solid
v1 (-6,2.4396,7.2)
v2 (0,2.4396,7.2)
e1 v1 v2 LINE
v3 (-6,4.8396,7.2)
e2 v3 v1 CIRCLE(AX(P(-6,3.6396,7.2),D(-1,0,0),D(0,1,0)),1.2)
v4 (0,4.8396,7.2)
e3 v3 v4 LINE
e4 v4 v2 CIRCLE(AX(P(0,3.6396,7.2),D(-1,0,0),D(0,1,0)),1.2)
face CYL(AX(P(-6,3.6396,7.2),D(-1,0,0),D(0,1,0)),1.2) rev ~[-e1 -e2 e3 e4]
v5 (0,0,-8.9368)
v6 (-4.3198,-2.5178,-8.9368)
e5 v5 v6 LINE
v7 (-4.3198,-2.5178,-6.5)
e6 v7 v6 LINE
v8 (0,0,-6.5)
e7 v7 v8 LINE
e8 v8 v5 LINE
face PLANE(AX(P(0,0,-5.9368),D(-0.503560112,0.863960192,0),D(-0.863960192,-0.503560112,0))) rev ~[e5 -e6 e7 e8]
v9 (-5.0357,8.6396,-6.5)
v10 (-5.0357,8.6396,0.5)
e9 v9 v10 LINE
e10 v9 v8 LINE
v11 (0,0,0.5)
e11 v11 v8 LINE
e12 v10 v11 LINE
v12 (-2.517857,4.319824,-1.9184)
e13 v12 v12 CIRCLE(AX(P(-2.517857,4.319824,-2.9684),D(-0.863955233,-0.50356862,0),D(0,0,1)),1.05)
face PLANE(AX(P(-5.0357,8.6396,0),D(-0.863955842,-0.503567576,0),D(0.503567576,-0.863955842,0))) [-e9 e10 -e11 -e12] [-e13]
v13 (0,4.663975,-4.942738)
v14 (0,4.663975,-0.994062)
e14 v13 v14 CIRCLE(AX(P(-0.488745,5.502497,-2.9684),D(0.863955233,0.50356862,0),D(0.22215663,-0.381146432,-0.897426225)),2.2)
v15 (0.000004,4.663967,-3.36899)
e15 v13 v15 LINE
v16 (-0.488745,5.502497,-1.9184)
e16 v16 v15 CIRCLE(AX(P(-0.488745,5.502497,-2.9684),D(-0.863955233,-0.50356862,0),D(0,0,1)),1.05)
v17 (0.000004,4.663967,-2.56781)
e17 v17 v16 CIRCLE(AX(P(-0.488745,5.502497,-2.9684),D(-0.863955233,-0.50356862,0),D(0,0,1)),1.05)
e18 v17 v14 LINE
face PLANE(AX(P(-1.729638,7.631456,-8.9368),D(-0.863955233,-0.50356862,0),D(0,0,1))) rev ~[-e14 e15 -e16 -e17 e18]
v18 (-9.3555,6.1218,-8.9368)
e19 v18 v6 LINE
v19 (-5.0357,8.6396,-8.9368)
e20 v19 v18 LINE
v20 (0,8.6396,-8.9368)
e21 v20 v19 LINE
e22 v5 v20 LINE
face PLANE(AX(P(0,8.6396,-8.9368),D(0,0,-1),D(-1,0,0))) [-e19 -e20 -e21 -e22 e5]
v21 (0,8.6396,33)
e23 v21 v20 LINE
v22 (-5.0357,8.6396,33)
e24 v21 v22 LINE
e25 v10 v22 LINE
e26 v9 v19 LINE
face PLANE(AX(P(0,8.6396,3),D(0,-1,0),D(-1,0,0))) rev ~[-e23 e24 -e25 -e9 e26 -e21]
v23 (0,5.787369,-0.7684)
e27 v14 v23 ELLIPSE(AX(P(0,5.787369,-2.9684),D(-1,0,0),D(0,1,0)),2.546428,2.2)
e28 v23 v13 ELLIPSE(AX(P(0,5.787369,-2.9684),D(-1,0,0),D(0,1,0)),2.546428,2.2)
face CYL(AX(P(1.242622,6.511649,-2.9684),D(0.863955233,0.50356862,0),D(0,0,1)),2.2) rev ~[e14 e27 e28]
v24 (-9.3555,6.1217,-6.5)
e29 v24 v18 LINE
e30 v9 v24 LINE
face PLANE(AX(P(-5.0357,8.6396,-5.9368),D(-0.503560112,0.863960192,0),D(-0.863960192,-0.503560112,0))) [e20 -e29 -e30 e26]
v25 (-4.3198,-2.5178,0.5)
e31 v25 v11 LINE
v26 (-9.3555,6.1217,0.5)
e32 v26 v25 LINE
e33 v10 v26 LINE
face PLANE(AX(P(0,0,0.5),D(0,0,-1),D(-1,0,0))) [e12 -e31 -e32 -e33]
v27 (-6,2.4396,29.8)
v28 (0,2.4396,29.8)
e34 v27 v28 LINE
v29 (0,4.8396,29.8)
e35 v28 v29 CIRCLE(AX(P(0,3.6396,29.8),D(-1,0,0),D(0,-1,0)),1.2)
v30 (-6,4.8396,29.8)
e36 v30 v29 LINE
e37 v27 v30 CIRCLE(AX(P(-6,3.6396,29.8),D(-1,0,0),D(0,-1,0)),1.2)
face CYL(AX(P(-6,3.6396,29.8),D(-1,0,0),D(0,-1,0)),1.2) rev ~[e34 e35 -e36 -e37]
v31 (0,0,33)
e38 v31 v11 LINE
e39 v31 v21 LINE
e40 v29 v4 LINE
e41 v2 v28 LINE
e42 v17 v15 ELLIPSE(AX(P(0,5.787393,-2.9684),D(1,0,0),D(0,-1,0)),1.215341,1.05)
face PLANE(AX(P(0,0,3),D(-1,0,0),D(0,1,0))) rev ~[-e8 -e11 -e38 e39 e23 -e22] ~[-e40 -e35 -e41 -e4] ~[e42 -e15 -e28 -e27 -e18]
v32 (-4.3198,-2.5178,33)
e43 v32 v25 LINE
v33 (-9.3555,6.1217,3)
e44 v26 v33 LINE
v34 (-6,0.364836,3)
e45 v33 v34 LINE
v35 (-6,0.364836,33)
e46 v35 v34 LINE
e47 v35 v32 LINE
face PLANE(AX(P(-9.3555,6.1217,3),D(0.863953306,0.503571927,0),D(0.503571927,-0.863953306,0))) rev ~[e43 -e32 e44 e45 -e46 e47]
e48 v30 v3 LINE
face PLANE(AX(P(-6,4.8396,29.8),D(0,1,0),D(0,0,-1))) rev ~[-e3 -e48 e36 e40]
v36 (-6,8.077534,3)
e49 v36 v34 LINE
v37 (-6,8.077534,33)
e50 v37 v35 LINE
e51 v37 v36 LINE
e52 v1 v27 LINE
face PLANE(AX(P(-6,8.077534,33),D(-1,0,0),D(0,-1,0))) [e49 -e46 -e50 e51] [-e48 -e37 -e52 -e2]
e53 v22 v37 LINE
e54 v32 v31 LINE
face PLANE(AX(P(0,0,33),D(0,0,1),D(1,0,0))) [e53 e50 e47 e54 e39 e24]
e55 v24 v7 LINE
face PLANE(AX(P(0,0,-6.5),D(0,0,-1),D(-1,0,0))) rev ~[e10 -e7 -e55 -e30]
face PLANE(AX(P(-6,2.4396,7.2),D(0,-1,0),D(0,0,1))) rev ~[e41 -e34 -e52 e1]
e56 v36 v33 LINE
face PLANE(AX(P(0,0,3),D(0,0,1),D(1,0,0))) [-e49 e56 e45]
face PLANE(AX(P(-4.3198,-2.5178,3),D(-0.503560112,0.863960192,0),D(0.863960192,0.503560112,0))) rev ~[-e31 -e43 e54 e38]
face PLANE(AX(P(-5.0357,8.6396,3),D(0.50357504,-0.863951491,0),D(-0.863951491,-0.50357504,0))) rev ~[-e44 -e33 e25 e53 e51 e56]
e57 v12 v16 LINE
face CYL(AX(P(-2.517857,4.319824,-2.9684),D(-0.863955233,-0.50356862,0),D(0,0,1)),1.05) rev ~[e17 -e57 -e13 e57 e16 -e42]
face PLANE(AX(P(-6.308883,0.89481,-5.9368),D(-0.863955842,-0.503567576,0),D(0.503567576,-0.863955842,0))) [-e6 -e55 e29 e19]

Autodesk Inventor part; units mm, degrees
ref_plane "YZ Plane" through (0, 0, 0) normal (1, 0, 0) x (0, 1, 0)
ref_plane "XZ Plane" through (0, 0, 0) normal (0, 1, 0) x (-1, 0, 0)
sketch "Skizze1" plane through (0, 0, 0) normal (0, 0, 1) x (1, 0, 0)
  line L0 (0, 0) -> (-5.0357, 8.6396) projected
  line L1 (-5.0357, 8.6396) -> (-9.3555, 6.1217) projected
  line L2 (-4.3198, -2.5178) -> (-9.3555, 6.1217) projected
  line L3 (0, 0) -> (-4.3198, -2.5178) projected
  line L4 (0, 0) -> (0, 8.6396)
  line L5 (0, 8.6396) -> (-5.0357, 8.6396)
extrude "Extrusion1" add sketch "Skizze1" along normal blind 3
sketch "Skizze2" plane through (0, 0, 3) normal (0, 0, 1) x (1, 0, 0)
  line L0 (0, 8.6396) -> (-5.0357, 8.6396) projected
  line L1 (0, 0) -> (0, 8.6396) projected
  line L2 (-4.3198, -2.5178) -> (0, 0) projected
  line L3 (-9.3555, 6.1217) -> (-4.3198, -2.5178) projected
  line L4 (-5.0357, 8.6396) -> (-9.3555, 6.1217) projected
  line L5 (0, 0) -> (-5.0357, 8.6396) projected
  line L6 (0, 0) -> (-4.3198, -2.5178) projected
  line L7 (-9.3555, 6.1217) -> (-4.3198, -2.5178) projected
  line L8 (-5.0357, 8.6396) -> (-9.3555, 6.1217) projected
ref_plane "Arbeitsebene1" through (-10.5829, -3.5471, -5.9368) normal (0, 0, -1) x (0, 1, 0)
extrude "Extrusion2" add sketch "Skizze2" against normal up to surface (8.9368 mm away) contours L1 L5 L0
sketch "Skizze3" plane through (0, 8.6396, -5.9368) normal (0, 0, -1) x (-1, 0, 0)
  line L0 (6.3089, -7.7448) -> (1.9891, -5.2269)
  line L1 (0, -8.6396) -> (5.0357, 0) projected
  line L2 (0, -8.6396) -> (4.3198, -11.1574) projected
  line L3 (9.3555, -2.5178) -> (4.3198, -11.1574) projected
  line L4 (5.0357, 0) -> (9.3555, -2.5178) projected
  line L5 (0, -8.6396) -> (0, 0) projected
  line L6 (5.0357, 0) -> (0, -8.6396) projected
  line L7 (0, 0) -> (5.0357, 0) projected
extrude "Extrusion3" add sketch "Skizze3" along normal blind 3
sketch "Skizze4" plane through (-5.0357, 8.6396, -5.9368) normal (-0.8639552, -0.5035686, 0) x (0, 0, 1)
  circle A0 centre (2.9684, -5) radius 1.05 projected
  point P0 (5.9368, -10)
extrude "Extrusion4" cut sketch "Skizze4" against normal through all
sketch "Skizze6" plane through (0, 0, 3) normal (0, 0, 1) x (1, 0, 0)
  line L0 (-5.0357, 8.6396) -> (-9.3555, 6.1217) projected
  line L1 (-9.3555, 6.1217) -> (-4.3198, -2.5178) projected
  line L2 (-4.3198, -2.5178) -> (0, 0) projected
  line L3 (0, 0) -> (0, 8.6396) projected
  line L4 (0, 8.6396) -> (-5.0357, 8.6396) projected
extrude "Extrusion5" add sketch "Skizze6" along normal blind 30
sketch "Skizze7" plane through (0, 0, 33) normal (0, 0, 1) x (1, 0, 0)
  line L0 (0, 8.6396) -> (0, 0) projected
  line L1 (0, 8.6396) -> (-6, 8.6396)
  line L2 (-6, 8.6396) -> (-6, -6.275)
  line L3 (-6, -6.275) -> (0, -6.275)
  line L4 (0, -6.275) -> (0, 8.6396)
  line L5 (-4.3198, -2.5178) -> (0, 0) projected
  line L6 (0, 0) -> (0, 8.6396) projected
  line L7 (0, 8.6396) -> (-5.0357, 8.6396) projected
  line L8 (-5.0357, 8.6396) -> (-9.3555, 6.1217) projected
  line L9 (-9.3555, 6.1217) -> (-4.3198, -2.5178) projected
  point P0 (-6, 0.3649)
  point P1 (-6, 8.0775)
  dimension "d10" = 6
extrude "Extrusion6" cut sketch "Skizze7" against normal blind 30 contours L2 L9 L8
sketch "Skizze8" plane through (-6, 0.3649, 33) normal (-1, 0, 0) x (0, 0, 1)
  line L0 (-3.2, 3.2747) -> (-25.8, 3.2747) construction
  line L1 (-3.2, 4.4747) -> (-25.8, 4.4747)
  line L2 (-25.8, 2.0747) -> (-3.2, 2.0747)
  arc A0 (-3.2, 2.0747) -> (-3.2, 4.4747) centre (-3.2, 3.2747) ccw
  arc A1 (-25.8, 4.4747) -> (-25.8, 2.0747) centre (-25.8, 3.2747) ccw
  line L3 (0, 7.7126) -> (0, 0) projected
  line L4 (-33, 8.2747) -> (0, 8.2747) projected
  point P0 (-33, -0.3649)
  point P1 (-14.5, 3.2747)
  dimension "d13" = 2.4
  dimension "d14" = 25
  dimension "d15" = 2
  dimension "d16" = 5
extrude "Extrusion7" cut sketch "Skizze8" against normal blind 30
ref_plane "Arbeitsebene2" through (0, 8.6396, -8.9368) normal (-0.8639552, -0.5035686, 0) x (0, 0, 1)
sketch "Skizze9" plane through (0, 8.6396, -8.9368) normal (-0.8639552, -0.5035686, 0) x (0, 0, 1)
  circle A0 centre (5.9684, -2.4642) radius 1.05 projected
  circle A1 centre (5.9684, -2.4642) radius 1.05 projected
  circle A2 centre (5.9684, -2.4642) radius 2.2
  point P0 (8.9368, -7.4642)
  dimension "d19" = 4.4
extrude "Extrusion8" cut sketch "Skizze9" along normal blind 2
sketch "Skizze10" plane through (0, 0, 0) normal (0, 0, -1) x (-1, 0, 0)
  line L0 (5.0357, 8.6396) -> (0, 0) projected
  line L1 (4.3198, -2.5178) -> (0, 0) projected
  line L2 (9.3555, 6.1217) -> (4.3198, -2.5178) projected
  line L3 (5.0357, 8.6396) -> (9.3555, 6.1217) projected
extrude "Extrusion9" cut sketch "Skizze10" along normal blind 6.5 and the other way blind 0.5
properties part number "Slider"
